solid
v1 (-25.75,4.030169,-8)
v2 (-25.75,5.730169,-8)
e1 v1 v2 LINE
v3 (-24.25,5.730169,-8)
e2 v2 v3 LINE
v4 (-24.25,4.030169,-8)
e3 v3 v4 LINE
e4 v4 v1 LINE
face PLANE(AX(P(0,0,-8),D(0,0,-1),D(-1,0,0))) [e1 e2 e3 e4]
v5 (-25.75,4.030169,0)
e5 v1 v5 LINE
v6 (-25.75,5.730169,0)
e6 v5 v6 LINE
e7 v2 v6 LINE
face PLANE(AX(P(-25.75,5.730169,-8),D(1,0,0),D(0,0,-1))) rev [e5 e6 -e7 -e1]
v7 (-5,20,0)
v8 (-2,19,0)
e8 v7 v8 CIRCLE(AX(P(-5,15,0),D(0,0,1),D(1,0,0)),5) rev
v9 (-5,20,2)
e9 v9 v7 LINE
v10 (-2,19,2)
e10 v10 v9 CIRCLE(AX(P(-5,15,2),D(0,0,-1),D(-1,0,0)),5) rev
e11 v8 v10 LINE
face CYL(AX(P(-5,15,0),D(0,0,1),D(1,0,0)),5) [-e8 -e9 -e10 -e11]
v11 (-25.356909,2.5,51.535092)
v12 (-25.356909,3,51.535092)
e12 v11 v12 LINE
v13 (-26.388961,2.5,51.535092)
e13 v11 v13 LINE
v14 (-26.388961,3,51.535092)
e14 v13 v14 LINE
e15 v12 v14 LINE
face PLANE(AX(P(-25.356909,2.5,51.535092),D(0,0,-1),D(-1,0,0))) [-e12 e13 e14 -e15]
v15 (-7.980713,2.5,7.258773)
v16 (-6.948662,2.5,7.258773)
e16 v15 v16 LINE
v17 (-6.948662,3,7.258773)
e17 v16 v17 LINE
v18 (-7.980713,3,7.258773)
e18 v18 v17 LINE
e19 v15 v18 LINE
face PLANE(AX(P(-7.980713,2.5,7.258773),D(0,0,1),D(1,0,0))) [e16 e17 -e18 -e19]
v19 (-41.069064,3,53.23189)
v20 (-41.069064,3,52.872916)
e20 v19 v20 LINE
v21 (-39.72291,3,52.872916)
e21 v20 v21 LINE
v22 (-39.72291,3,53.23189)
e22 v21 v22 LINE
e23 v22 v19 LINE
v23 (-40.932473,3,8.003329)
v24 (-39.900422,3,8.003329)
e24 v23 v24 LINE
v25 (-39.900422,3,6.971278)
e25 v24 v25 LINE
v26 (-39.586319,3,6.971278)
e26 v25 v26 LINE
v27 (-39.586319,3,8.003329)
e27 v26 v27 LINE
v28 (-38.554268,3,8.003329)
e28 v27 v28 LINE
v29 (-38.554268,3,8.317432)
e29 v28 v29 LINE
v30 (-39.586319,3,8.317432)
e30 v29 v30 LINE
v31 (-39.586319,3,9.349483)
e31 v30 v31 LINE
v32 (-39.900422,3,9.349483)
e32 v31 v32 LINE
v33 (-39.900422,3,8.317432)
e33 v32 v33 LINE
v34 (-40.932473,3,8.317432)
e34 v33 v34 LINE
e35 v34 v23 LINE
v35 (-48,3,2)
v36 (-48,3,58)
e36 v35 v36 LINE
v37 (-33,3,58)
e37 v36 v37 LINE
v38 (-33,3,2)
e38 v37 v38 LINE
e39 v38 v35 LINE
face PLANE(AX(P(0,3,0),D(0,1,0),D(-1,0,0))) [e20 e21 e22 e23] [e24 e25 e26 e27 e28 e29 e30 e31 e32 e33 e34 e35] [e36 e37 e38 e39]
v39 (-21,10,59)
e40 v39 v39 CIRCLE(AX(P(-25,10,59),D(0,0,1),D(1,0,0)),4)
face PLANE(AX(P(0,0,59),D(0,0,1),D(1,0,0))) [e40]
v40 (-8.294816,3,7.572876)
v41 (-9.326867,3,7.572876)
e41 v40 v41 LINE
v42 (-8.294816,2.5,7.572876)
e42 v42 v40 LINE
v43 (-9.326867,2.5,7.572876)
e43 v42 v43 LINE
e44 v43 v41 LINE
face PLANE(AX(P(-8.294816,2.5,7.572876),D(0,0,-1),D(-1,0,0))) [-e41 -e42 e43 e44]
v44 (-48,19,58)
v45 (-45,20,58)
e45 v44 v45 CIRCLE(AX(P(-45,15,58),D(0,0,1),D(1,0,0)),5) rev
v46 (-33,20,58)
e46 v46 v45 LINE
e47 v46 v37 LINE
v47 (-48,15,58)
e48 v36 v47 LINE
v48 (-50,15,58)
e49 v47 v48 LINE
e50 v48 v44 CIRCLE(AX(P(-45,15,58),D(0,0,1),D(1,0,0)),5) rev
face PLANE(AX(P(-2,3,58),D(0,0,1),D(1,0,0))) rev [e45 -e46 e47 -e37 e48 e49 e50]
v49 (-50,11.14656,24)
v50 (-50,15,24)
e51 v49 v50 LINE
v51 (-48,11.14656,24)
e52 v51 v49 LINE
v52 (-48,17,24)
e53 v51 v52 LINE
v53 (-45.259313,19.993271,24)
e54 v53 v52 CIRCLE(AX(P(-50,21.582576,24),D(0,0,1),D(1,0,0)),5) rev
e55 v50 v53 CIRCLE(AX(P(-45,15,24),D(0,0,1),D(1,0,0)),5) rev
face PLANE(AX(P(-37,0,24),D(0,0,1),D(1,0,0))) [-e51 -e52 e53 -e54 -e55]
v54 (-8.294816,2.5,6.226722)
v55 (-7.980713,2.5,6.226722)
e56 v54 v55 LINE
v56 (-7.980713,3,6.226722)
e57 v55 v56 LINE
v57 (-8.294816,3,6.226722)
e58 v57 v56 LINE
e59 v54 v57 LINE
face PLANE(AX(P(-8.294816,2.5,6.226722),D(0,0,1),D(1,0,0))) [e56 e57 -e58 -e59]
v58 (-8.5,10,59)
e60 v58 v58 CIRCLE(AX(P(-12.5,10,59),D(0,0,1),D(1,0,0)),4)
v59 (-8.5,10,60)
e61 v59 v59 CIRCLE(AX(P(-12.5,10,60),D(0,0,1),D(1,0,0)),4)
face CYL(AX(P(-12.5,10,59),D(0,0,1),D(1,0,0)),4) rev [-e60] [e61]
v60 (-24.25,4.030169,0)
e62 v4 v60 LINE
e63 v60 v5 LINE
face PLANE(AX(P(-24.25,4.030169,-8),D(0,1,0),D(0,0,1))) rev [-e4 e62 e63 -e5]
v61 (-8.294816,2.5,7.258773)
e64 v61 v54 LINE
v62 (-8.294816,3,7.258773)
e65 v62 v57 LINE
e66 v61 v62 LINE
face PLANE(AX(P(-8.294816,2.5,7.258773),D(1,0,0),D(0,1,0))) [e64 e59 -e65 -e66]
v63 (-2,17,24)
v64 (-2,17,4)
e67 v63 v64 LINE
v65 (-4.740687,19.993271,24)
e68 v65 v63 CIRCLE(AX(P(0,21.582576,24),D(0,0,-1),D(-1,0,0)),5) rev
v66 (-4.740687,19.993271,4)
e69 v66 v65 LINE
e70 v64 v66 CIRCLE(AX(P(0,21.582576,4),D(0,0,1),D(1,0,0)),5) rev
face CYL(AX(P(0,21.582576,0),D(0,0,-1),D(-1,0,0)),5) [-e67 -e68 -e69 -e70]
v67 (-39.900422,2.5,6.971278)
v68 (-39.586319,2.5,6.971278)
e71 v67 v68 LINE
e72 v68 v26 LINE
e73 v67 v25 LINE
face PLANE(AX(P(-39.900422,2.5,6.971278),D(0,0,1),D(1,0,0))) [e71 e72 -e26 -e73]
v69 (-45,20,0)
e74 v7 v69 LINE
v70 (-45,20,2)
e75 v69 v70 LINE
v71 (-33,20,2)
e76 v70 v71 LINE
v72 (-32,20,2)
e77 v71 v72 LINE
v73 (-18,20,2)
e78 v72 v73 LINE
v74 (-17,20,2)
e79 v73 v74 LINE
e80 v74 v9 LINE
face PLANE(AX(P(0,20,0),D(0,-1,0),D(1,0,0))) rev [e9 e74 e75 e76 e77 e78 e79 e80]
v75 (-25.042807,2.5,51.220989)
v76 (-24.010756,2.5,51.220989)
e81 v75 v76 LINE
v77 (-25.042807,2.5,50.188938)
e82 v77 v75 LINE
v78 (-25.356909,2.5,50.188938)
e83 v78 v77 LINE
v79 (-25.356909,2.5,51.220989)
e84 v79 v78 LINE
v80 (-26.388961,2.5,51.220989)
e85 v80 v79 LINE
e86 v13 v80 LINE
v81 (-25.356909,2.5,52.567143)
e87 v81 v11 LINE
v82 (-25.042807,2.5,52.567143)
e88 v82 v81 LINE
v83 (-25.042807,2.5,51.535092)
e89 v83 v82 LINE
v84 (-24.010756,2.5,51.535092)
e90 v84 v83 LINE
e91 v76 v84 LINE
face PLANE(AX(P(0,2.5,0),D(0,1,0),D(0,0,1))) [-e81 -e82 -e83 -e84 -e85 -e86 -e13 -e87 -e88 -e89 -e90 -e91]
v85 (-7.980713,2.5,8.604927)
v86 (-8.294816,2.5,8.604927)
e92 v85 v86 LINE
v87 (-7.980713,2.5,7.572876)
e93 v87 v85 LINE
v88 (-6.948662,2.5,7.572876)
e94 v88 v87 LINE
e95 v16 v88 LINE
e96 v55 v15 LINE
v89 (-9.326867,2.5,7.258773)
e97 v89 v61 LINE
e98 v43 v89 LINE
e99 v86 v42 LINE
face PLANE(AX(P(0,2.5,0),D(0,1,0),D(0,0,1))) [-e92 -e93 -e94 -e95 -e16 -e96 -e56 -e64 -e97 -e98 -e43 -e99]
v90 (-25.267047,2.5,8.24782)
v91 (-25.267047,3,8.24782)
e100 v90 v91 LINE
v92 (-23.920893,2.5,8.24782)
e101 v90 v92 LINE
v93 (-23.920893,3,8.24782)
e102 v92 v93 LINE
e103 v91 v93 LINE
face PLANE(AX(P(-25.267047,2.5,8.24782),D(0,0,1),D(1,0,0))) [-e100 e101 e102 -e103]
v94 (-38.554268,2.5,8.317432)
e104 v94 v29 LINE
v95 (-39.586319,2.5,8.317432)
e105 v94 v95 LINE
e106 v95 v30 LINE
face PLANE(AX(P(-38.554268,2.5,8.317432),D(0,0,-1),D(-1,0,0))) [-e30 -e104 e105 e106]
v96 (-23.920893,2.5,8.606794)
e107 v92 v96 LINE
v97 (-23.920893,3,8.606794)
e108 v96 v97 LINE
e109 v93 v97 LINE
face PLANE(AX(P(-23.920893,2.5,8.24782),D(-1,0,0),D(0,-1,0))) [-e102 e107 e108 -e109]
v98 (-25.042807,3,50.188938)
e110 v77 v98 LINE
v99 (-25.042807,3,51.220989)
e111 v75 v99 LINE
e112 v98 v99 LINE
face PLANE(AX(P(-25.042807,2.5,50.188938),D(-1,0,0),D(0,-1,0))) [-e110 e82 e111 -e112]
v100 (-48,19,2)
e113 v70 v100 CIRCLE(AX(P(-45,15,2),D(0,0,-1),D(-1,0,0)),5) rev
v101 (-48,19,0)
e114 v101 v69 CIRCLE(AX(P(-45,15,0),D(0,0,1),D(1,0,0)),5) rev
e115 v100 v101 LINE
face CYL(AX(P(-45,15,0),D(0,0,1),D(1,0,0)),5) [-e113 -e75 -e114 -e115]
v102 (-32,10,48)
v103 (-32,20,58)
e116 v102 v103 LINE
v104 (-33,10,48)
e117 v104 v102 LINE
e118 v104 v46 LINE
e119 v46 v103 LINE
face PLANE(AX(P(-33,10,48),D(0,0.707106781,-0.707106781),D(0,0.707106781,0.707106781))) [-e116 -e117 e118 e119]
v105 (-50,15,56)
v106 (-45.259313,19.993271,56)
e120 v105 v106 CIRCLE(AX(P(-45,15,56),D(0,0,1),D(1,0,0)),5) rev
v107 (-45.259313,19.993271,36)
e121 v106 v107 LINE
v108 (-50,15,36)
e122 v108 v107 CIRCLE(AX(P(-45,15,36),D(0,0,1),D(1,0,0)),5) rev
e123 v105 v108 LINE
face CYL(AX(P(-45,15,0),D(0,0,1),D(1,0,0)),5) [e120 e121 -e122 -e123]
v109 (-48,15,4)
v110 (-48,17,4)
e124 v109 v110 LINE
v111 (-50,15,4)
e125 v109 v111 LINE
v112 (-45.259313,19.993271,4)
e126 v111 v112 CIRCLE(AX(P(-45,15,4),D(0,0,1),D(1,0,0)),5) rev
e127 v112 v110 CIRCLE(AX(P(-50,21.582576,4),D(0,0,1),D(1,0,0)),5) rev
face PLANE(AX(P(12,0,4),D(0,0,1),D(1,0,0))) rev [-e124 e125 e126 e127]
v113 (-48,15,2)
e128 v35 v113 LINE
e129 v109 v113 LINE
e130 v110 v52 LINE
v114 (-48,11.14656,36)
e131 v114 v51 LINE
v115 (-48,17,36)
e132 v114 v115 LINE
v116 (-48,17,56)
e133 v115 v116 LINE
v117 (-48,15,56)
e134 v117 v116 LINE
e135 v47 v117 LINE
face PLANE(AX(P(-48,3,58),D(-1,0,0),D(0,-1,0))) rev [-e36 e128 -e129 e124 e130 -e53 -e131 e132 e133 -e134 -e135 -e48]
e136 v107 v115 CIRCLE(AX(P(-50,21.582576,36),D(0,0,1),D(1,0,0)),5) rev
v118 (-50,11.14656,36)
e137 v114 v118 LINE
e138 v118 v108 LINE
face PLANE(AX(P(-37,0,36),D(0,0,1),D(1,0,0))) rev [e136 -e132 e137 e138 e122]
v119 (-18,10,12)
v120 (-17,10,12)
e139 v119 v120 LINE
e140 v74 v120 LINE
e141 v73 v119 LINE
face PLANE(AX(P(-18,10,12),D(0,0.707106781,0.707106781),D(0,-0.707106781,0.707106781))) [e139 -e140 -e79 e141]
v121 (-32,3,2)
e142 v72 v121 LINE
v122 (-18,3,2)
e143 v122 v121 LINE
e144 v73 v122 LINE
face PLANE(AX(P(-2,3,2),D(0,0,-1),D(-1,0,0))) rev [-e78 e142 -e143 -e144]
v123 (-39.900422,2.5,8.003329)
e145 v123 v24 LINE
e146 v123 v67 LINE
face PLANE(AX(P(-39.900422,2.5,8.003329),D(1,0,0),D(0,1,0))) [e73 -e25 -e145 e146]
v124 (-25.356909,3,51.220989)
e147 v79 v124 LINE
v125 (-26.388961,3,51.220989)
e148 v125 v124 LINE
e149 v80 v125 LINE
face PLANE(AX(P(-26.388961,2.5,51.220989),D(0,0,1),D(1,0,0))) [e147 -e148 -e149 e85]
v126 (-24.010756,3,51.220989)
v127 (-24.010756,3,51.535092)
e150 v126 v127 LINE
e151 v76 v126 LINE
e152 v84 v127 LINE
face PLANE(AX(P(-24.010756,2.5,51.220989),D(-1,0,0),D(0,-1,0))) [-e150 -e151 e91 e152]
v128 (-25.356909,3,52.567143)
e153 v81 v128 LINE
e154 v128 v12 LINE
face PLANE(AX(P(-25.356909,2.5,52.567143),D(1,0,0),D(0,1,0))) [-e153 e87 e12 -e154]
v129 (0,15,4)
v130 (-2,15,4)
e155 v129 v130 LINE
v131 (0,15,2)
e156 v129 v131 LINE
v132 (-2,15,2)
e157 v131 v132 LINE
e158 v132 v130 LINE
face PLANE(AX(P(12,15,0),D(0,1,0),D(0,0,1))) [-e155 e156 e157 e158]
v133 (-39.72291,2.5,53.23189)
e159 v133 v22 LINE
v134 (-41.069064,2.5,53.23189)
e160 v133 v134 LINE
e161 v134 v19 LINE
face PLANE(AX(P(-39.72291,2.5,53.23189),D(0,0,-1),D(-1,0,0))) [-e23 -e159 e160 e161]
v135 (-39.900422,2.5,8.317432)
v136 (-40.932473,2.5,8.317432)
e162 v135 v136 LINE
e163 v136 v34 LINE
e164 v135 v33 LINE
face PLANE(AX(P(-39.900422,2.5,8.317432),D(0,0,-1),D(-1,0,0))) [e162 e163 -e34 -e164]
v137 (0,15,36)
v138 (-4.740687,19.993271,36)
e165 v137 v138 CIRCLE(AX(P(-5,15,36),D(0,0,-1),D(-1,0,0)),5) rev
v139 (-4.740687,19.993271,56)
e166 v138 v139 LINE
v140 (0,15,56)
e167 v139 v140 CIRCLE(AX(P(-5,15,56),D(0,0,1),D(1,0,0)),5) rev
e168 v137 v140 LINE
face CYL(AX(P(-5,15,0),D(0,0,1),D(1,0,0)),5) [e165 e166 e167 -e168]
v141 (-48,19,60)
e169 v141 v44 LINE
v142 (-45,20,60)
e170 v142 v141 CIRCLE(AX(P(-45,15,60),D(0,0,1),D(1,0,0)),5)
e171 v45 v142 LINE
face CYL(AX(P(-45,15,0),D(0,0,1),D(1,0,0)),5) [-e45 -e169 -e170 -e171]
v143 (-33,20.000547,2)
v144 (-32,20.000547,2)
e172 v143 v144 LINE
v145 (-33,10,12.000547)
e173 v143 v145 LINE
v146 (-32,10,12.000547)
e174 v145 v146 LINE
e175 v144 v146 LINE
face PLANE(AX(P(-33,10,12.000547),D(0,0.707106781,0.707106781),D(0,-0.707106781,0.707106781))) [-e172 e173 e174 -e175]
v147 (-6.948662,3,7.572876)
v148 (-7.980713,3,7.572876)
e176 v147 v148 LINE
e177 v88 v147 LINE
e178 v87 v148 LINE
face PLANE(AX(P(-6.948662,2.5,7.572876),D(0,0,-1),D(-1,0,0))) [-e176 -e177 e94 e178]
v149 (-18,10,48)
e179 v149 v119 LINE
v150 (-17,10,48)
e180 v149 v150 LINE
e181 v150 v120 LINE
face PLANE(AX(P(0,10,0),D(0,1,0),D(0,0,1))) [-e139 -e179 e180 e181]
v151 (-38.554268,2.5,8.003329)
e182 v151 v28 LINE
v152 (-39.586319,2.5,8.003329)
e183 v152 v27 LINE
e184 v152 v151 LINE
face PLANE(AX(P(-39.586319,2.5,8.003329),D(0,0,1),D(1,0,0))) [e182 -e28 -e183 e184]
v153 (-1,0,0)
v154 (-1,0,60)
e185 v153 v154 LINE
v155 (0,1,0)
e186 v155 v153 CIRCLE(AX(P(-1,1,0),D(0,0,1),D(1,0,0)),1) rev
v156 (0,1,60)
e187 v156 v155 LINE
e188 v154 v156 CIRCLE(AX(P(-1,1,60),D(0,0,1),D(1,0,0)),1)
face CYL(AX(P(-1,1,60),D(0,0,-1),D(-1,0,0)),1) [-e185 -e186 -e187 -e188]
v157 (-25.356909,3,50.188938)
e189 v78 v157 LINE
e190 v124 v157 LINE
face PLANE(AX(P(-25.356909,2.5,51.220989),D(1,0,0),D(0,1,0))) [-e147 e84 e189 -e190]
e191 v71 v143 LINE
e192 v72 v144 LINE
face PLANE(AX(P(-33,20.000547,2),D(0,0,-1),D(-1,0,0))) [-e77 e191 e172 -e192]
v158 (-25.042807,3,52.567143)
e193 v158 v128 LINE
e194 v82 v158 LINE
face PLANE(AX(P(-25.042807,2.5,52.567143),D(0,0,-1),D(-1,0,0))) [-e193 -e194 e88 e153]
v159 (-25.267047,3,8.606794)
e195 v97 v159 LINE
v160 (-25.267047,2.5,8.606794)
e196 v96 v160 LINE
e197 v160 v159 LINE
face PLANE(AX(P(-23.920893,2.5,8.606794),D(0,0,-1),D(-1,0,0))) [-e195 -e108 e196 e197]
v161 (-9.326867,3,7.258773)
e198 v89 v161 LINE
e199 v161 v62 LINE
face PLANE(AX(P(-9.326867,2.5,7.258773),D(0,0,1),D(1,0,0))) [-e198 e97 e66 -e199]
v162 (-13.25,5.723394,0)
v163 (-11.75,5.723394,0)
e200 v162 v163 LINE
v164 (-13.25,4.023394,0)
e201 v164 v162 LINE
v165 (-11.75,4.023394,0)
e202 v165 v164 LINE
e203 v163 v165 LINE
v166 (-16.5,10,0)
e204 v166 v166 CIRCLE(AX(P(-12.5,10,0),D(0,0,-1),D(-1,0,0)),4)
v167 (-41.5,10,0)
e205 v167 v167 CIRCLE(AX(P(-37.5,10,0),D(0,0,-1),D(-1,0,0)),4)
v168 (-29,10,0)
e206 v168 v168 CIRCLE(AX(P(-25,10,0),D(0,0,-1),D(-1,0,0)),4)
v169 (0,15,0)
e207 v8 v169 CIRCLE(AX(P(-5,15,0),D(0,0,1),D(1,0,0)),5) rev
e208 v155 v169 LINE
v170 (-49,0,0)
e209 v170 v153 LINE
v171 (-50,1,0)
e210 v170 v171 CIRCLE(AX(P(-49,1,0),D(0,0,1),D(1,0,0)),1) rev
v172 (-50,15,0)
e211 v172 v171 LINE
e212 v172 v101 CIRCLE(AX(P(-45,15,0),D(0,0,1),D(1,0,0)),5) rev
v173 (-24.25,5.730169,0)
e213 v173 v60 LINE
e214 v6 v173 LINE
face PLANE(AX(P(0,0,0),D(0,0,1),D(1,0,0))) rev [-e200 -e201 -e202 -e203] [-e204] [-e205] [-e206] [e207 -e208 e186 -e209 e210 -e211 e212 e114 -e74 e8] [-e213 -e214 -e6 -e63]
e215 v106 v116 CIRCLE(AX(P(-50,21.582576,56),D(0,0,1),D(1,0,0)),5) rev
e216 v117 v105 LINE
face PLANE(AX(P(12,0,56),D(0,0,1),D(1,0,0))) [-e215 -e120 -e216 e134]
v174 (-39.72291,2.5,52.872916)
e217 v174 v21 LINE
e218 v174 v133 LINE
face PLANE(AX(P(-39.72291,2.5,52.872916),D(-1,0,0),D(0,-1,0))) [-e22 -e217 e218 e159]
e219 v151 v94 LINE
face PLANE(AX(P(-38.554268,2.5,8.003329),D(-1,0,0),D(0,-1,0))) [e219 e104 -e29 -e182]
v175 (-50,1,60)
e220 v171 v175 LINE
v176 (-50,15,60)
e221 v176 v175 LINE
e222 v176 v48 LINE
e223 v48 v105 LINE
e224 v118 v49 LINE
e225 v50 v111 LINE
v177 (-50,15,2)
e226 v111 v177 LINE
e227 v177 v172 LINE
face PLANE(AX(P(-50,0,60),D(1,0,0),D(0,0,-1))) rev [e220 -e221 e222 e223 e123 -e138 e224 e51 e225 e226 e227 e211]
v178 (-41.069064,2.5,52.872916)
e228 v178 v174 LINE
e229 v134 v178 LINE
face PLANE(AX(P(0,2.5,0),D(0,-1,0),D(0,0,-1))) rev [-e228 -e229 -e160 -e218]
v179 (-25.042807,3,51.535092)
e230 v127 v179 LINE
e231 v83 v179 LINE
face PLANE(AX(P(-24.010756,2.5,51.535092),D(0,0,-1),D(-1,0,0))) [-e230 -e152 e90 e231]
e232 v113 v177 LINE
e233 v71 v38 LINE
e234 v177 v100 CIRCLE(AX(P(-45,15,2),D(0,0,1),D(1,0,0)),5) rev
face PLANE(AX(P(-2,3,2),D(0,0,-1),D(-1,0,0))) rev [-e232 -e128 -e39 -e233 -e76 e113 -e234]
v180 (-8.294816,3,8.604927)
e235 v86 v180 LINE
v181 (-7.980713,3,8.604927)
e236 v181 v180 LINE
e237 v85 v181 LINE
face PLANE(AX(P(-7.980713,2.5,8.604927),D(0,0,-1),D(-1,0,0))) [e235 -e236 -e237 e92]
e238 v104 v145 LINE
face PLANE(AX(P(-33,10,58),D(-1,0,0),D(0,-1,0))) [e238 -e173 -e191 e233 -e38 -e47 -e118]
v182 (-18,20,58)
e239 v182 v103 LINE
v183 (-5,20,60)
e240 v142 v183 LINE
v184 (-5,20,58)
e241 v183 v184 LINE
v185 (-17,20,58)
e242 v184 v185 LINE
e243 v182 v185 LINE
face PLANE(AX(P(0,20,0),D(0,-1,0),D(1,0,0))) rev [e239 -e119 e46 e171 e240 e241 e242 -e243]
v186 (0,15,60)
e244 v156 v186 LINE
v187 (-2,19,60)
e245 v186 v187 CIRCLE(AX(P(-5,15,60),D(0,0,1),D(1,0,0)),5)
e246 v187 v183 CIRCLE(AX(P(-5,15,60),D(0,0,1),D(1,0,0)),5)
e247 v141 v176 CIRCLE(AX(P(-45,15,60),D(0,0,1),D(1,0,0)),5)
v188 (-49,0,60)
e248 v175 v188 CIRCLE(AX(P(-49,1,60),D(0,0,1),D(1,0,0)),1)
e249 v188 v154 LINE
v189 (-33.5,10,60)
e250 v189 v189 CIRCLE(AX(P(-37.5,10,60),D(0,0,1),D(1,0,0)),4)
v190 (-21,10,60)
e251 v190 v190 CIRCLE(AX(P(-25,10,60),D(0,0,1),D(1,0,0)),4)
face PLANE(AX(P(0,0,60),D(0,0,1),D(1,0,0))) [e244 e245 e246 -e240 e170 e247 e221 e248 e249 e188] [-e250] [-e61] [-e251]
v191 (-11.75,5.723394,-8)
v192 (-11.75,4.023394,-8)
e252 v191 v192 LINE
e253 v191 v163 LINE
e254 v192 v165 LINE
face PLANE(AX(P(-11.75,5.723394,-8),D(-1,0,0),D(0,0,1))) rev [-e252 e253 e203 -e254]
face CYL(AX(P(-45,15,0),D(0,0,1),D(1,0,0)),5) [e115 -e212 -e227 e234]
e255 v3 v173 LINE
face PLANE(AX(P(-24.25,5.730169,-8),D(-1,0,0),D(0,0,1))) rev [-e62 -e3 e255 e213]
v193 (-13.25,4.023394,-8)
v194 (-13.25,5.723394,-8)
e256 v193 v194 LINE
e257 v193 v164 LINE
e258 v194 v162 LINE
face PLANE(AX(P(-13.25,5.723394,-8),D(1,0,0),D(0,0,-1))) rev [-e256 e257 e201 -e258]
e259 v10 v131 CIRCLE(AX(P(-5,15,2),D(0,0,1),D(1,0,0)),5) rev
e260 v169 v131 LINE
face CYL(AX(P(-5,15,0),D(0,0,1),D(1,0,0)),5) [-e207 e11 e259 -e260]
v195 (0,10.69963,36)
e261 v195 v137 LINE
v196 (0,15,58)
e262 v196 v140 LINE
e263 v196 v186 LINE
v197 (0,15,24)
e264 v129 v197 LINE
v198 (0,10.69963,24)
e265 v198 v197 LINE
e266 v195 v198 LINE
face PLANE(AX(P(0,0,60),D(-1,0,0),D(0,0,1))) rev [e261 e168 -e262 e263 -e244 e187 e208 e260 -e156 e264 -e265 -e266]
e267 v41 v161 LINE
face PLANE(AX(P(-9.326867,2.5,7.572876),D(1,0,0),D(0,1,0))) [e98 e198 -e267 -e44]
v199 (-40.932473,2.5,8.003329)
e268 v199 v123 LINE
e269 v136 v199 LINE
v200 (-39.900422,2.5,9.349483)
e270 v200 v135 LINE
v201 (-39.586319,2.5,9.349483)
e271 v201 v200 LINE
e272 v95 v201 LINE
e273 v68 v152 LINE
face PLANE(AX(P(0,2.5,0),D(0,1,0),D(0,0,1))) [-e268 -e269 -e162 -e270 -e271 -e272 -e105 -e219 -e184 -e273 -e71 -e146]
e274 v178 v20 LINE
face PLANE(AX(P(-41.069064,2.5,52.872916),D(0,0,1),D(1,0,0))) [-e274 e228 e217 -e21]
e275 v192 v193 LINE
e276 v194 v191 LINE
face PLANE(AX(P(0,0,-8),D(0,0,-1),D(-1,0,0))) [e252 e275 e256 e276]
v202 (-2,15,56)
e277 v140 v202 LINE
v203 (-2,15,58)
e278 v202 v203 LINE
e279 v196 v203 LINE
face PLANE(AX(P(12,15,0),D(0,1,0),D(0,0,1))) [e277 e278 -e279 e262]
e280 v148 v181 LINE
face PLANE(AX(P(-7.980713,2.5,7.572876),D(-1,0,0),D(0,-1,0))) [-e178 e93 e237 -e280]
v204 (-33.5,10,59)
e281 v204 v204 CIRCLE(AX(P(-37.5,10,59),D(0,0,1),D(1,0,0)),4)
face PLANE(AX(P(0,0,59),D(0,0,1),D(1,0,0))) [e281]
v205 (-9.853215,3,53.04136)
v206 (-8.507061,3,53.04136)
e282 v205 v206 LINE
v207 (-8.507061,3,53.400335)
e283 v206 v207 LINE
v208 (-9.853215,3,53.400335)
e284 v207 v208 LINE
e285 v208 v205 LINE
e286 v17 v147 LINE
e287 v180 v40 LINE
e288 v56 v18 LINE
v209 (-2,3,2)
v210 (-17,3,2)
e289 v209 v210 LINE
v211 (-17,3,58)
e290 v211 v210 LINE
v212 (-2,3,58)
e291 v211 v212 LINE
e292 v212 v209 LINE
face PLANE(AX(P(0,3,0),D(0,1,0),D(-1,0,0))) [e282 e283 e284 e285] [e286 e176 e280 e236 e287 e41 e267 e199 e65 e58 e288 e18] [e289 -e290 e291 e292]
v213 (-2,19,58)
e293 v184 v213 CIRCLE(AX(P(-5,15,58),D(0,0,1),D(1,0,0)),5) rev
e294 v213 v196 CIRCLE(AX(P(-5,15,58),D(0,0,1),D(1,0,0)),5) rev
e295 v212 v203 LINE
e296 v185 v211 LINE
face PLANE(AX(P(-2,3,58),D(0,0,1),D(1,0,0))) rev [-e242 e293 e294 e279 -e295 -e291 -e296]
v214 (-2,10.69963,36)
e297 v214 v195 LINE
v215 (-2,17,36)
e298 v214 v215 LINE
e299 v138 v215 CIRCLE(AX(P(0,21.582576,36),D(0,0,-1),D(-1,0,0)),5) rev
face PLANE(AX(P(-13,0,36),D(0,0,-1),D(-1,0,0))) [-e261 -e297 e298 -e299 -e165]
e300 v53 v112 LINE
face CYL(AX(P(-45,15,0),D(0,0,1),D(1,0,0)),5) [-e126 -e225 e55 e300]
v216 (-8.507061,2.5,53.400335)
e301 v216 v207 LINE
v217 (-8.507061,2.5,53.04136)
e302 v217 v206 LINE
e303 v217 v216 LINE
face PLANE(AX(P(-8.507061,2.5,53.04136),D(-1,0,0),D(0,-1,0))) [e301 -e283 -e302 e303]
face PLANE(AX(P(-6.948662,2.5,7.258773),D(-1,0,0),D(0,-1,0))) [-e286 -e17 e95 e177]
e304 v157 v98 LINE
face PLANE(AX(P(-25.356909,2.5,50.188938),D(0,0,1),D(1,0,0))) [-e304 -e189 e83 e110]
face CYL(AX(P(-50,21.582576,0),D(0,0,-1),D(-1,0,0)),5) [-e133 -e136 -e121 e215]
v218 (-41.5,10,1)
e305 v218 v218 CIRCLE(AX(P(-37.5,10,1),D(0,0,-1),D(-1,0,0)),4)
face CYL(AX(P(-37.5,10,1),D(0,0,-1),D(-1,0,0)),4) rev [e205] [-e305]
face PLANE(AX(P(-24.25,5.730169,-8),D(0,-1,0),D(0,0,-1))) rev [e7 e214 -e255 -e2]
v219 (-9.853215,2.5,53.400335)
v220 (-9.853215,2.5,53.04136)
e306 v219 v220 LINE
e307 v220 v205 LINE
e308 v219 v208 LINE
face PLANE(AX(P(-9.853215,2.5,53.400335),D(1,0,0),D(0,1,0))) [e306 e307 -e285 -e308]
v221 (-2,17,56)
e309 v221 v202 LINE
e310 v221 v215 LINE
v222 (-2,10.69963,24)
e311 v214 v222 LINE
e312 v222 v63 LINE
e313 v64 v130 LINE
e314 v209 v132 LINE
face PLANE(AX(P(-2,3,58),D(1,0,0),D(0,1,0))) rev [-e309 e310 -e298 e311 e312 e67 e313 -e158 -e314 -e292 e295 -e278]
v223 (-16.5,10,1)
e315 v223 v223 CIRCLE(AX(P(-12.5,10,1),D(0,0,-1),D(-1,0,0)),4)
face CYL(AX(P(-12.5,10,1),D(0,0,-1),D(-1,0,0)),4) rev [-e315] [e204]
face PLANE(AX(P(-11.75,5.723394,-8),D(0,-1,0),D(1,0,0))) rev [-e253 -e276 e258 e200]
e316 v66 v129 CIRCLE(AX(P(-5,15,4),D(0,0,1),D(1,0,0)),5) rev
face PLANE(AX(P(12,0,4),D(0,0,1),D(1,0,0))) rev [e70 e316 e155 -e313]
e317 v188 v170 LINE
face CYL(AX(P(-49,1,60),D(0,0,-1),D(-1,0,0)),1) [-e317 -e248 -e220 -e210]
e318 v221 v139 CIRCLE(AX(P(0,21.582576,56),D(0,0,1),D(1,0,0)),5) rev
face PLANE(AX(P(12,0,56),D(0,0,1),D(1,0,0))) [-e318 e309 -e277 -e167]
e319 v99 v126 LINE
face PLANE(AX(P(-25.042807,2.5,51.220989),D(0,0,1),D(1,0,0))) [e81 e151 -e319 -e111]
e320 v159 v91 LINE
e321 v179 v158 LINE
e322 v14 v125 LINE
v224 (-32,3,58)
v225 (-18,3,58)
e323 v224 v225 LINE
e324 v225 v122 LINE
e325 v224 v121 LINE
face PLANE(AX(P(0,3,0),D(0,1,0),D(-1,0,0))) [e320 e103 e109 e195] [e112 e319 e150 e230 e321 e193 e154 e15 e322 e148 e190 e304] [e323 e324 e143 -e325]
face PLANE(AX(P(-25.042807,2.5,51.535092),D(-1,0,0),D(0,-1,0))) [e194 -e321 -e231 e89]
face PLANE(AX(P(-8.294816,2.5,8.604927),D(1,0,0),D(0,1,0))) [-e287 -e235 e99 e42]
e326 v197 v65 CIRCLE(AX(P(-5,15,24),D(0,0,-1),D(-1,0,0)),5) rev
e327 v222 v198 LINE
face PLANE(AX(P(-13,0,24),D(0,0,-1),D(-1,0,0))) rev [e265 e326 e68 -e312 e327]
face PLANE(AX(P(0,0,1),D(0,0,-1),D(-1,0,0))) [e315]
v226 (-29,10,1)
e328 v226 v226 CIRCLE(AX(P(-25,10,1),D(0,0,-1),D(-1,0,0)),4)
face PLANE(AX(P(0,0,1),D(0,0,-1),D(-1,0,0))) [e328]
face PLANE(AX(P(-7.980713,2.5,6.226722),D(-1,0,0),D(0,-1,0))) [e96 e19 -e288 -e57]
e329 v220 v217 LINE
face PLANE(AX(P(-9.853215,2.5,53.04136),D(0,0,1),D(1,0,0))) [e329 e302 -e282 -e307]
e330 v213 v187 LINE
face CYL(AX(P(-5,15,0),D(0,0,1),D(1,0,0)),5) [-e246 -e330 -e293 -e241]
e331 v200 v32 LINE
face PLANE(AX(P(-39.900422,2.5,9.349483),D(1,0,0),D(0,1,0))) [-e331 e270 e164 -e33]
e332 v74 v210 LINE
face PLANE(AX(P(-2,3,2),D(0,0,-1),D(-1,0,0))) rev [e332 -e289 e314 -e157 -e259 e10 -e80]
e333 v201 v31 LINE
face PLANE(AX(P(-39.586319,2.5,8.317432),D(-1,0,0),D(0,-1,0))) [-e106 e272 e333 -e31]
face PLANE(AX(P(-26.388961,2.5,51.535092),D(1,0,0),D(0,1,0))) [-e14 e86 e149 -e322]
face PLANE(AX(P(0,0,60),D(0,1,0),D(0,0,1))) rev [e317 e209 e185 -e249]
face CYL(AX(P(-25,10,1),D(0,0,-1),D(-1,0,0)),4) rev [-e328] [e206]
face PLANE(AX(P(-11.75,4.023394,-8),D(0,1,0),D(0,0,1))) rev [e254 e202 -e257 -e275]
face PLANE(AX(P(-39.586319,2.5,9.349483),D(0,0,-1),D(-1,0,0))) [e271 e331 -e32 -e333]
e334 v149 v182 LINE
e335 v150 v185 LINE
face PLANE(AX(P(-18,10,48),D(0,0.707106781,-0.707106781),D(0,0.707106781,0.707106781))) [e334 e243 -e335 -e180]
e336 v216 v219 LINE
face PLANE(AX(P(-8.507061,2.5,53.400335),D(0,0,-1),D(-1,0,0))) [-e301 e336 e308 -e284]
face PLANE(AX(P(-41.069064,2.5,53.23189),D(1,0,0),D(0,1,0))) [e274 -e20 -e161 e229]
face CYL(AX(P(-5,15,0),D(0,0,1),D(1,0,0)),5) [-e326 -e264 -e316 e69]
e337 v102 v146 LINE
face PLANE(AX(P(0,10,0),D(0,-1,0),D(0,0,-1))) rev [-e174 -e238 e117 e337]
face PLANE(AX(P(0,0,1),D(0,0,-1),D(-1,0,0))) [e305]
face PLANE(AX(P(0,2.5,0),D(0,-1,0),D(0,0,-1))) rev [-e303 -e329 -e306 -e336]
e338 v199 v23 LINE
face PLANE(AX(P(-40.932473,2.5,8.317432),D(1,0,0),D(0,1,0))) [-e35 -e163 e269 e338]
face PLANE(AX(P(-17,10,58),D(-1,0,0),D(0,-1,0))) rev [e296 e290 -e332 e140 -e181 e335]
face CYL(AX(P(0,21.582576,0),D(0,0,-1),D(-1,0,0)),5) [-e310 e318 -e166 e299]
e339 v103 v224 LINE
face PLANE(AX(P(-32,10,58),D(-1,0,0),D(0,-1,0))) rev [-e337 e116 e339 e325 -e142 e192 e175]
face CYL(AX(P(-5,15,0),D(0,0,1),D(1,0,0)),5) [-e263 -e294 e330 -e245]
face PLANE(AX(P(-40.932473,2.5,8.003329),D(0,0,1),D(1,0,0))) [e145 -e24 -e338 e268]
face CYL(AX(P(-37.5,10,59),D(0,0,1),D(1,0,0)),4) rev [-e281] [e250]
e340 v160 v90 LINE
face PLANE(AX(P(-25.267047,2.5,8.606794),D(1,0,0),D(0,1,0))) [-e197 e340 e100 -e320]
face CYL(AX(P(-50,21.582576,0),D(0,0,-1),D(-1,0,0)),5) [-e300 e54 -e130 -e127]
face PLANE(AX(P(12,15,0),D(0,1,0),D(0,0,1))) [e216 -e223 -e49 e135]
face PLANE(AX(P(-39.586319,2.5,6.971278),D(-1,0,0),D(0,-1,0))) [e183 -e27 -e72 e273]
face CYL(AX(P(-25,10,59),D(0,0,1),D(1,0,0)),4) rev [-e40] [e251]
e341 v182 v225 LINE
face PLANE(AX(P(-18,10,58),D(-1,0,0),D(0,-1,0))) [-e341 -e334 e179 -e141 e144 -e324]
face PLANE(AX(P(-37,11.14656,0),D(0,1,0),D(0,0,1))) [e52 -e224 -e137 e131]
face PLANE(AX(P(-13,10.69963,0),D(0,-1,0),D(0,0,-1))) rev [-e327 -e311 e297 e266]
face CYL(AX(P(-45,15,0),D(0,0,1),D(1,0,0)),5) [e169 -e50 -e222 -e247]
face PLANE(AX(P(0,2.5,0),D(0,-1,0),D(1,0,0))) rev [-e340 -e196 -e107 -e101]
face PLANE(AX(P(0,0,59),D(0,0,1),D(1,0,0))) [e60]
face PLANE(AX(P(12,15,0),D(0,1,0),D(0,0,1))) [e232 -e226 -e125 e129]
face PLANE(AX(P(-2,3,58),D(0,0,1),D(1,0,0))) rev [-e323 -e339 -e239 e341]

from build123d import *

# Parameters (mm, degrees)
ESQUISSE1_W             = 50
ESQUISSE1_H             = 17
BOSS_EXTRU_1_DEPTH      = 60
ESQUISSE2_W             = 46
ESQUISSE2_H             = 56
ENL_V_MAT_EXTRU_1_DEPTH = 14
ESQUISSE3_W             = 5
ESQUISSE3_H             = 60
BOSS_EXTRU_2_DEPTH      = 3
CONG_4_R                = 5
CONG_5_R                = 5
ESQUISSE4_W             = 6
ESQUISSE4_H             = 6.399260537
ESQUISSE4_H_2           = 4.300369731
ENL_V_MAT_EXTRU_2_DEPTH = 13
ESQUISSE5_W             = 6
ESQUISSE5_H             = 3.853440377
ESQUISSE5_H_2           = 6.397176283
ENL_V_MAT_EXTRU_3_DEPTH = 13
ESQUISSE6_W             = 46
ESQUISSE6_H             = 2
BOSS_EXTRU_3_DEPTH      = 3
CONG_6_R                = 5
CONG_7_R                = 5
CONG_8_R                = 5
ESQUISSE7_W             = 2
ESQUISSE7_H             = 5.210267062
ENL_V_MAT_EXTRU_4_DEPTH = 62
ESQUISSE8_W             = 2
ESQUISSE8_H             = 8.257223626
ENL_V_MAT_EXTRU_5_DEPTH = 62
ESQUISSE9_W             = 1
ESQUISSE9_H             = 56
BOSS_EXTRU_4_DEPTH      = 7
BOSS_EXTRU_5_DEPTH      = 1
BOSS_EXTRU_6_DEPTH      = 1
BOSS_EXTRU_7_DEPTH      = 1
BOSS_EXTRU_8_DEPTH      = 1
ENL_V_MAT_EXTRU_6_DEPTH = 0.5
ESQUISSE19_W            = 1.346153846
ESQUISSE19_H            = 0.358974359
ESQUISSE19_W_2          = 1.346153847
ENL_V_MAT_EXTRU_7_DEPTH = 0.5
CONG_9_R                = 1
CONG_10_R               = 1
ENL_V_MAT_EXTRU_8_DEPTH = 1
ENL_V_START             = -1
ENL_V_MAT_EXTRU_9_DEPTH = 1
ESQUISSE22_W            = 1.5
ESQUISSE22_H            = 1.7
BOSS_EXTRU_9_DEPTH      = 9


# Some blends are built 0.0001 mm under size
with BuildPart() as part:
    # Esquisse1 → Boss.-Extru.1 (new body)
    with BuildSketch(Plane.XY):
        with Locations((-25, 8.5)):
            Rectangle(ESQUISSE1_W, ESQUISSE1_H)
    extrude(amount=BOSS_EXTRU_1_DEPTH)

    # Esquisse2 → Enlèv. mat.-Extru.1 (cut)
    with BuildSketch(Plane(origin=(0, 17, 0), x_dir=(1, 0, 0), z_dir=(0, 1, 0))):
        with Locations((-25, -30)):
            Rectangle(ESQUISSE2_W, ESQUISSE2_H)
    extrude(amount=-ENL_V_MAT_EXTRU_1_DEPTH, mode=Mode.SUBTRACT)

    # Esquisse3 → Boss.-Extru.2 (add)
    with BuildSketch(Plane(origin=(0, 17, 0), x_dir=(1, 0, 0), z_dir=(0, 1, 0))):
        with Locations((-2.5, -30)):
            Rectangle(ESQUISSE3_W, ESQUISSE3_H)
        with Locations((-47.5, -30)):
            Rectangle(ESQUISSE3_W, ESQUISSE3_H)
    extrude(amount=BOSS_EXTRU_2_DEPTH)

    # Congé4
    cong_4_edges = [part.edges().sort_by_distance(p)[0] for p in [
        (-50, 20, 30),
        (0, 20, 30),
    ]]
    fillet(cong_4_edges, radius=CONG_4_R - 0.0001)  # a hair under: the kernel refuses the full size

    # Congé5
    # the kernel refuses this fillet: 5 mm, written as the material it takes off along each edge
    with BuildSketch(Plane(origin=(-45, 17, 69.456439237), x_dir=(0, 1, 0), z_dir=(0, 0, -1))) as cong_5_piece_1:
        with BuildLine():
            CenterArc((4.582575695, -5), CONG_5_R, 90, 66.421821522)
            Line((0, -3), (0, 0))
            Line((0, 0), (4.582575695, 0))
        make_face()
    extrude(amount=78.912878475, mode=Mode.SUBTRACT)
    with BuildSketch(Plane(origin=(-5, 17, 69.456439237), x_dir=(0, 1, 0), z_dir=(0, 0, -1))) as cong_5_piece_2:
        with BuildLine():
            CenterArc((4.582575695, 5), CONG_5_R, 203.578178478, 66.421821522)
            Line((0, 3), (0, 0))
            Line((0, 0), (4.582575695, 0))
        make_face()
    extrude(amount=78.912878475, mode=Mode.SUBTRACT)

    # Esquisse4 → Enlèv. mat.-Extru.2 (cut)
    with BuildSketch(Plane(origin=(0, 0, 0), x_dir=(0, 0, -1), z_dir=(1, 0, 0))):
        with Locations((-27, 18.199630269)):
            Rectangle(ESQUISSE4_W, ESQUISSE4_H)
        with Locations((-27, 12.849815135)):
            Rectangle(ESQUISSE4_W, ESQUISSE4_H_2)
        with Locations((-33, 12.849815135)):
            Rectangle(ESQUISSE4_W, ESQUISSE4_H_2)
        with Locations((-33, 18.199630269)):
            Rectangle(ESQUISSE4_W, ESQUISSE4_H)
    extrude(amount=-ENL_V_MAT_EXTRU_2_DEPTH, mode=Mode.SUBTRACT)

    # Esquisse5 → Enlèv. mat.-Extru.3 (cut)
    with BuildSketch(Plane.ZY.offset(50)):
        with Locations((27, 13.073279812)):
            Rectangle(ESQUISSE5_W, ESQUISSE5_H)
        with Locations((33, 13.073279812)):
            Rectangle(ESQUISSE5_W, ESQUISSE5_H)
        with Locations((33, 18.198588142)):
            Rectangle(ESQUISSE5_W, ESQUISSE5_H_2)
        with Locations((27, 18.198588142)):
            Rectangle(ESQUISSE5_W, ESQUISSE5_H_2)
    extrude(amount=-ENL_V_MAT_EXTRU_3_DEPTH, mode=Mode.SUBTRACT)

    # Esquisse6 → Boss.-Extru.3 (add)
    with BuildSketch(Plane(origin=(0, 17, 0), x_dir=(1, 0, 0), z_dir=(0, 1, 0))):
        with Locations((-25, -1)):
            Rectangle(ESQUISSE6_W, ESQUISSE6_H)
        with Locations((-25, -59)):
            Rectangle(ESQUISSE6_W, ESQUISSE6_H)
    extrude(amount=BOSS_EXTRU_3_DEPTH)

    # Congé6
    # the kernel refuses this fillet: 5 mm, written as the material it takes off along each edge
    with BuildSketch(Plane(origin=(-2, 20, 9.499833331), x_dir=(0, -1, 0), z_dir=(0, 0, -1))) as cong_6_piece_1:
        with BuildLine():
            CenterArc((5, 2.999933333), CONG_6_R, 180, 36.868942712)
            Line((0, 2.999933333), (-0.1, 2.999933333))
            Line((-0.1, 2.999933333), (-0.1, 0))
            Line((-0.1, 0), (0, -0.1))
            ThreePointArc((0, -0.1), (0.499975, -0.1), (0.919949, -0.059998667))
            Line((0.919949, -0.059998667), (0.99995, 0))
        make_face()
    extrude(amount=16.999666663, mode=Mode.SUBTRACT)

    # Congé7
    # the kernel refuses this fillet: 5 mm, written as the material it takes off along each edge
    with BuildSketch(Plane(origin=(-48, 20, -7.499833331), x_dir=(0, -1, 0), z_dir=(0, 0, 1))) as cong_7_piece_1:
        with BuildLine():
            CenterArc((5, 2.999933333), CONG_7_R, 180, 36.868942712)
            Line((0, 2.999933333), (-0.1, 2.999933333))
            Line((-0.1, 2.999933333), (-0.1, 0))
            Line((-0.1, 0), (0, -0.1))
            ThreePointArc((0, -0.1), (0.499975, -0.1), (0.919949, -0.059998667))
            Line((0.919949, -0.059998667), (0.99995, 0))
        make_face()
    extrude(amount=16.999666663, mode=Mode.SUBTRACT)

    # Congé8
    # the kernel refuses this fillet: 5 mm, written as the material it takes off along each edge
    with BuildSketch(Plane(origin=(-2, 20, 67.499833331), x_dir=(0, -1, 0), z_dir=(0, 0, -1))) as cong_8_piece_1:
        with BuildLine():
            CenterArc((5, 2.999933333), CONG_8_R, 180, 36.868942712)
            Line((0, 2.999933333), (-0.1, 2.999933333))
            Line((-0.1, 2.999933333), (-0.1, 0))
            Line((-0.1, 0), (0, -0.1))
            ThreePointArc((0, -0.1), (0.499975, -0.1), (0.919949, -0.059998667))
            Line((0.919949, -0.059998667), (0.99995, 0))
        make_face()
    extrude(amount=16.999666663, mode=Mode.SUBTRACT)
    with BuildSketch(Plane(origin=(-48, 20, 50.500166669), x_dir=(1, 0, 0), z_dir=(0, 0, 1))) as cong_8_piece_2:
        with BuildLine():
            CenterArc((2.999933333, -5), CONG_8_R, 90, 36.868942712)
            Line((0, -0.99995), (-0.059998667, -0.919949))
            ThreePointArc((-0.059998667, -0.919949), (-0.1, -0.499975), (-0.1, 0))
            Line((-0.1, 0), (0, 0.1))
            Line((0, 0.1), (2.999933333, 0.1))
            Line((2.999933333, 0.1), (2.999933333, 0))
        make_face()
    extrude(amount=16.999666663, mode=Mode.SUBTRACT)

    # Esquisse7 → Enlèv. mat.-Extru.4 (cut)
    with BuildSketch(Plane.ZY.offset(50)):
        with Locations((3, 17.605133531)):
            Rectangle(ESQUISSE7_W, ESQUISSE7_H)
    extrude(amount=-ENL_V_MAT_EXTRU_4_DEPTH, mode=Mode.SUBTRACT)

    # Esquisse8 → Enlèv. mat.-Extru.5 (cut)
    with BuildSketch(Plane.ZY.offset(50)):
        with Locations((57, 19.128611813)):
            Rectangle(ESQUISSE8_W, ESQUISSE8_H)
    extrude(amount=-ENL_V_MAT_EXTRU_5_DEPTH, mode=Mode.SUBTRACT)

    # Esquisse9 → Boss.-Extru.4 (add)
    with BuildSketch(Plane(origin=(0, 3, 0), x_dir=(1, 0, 0), z_dir=(0, 1, 0))):
        with Locations((-17.5, -30)):
            Rectangle(ESQUISSE9_W, ESQUISSE9_H)
        with Locations((-32.5, -30)):
            Rectangle(ESQUISSE9_W, ESQUISSE9_H)
    extrude(amount=BOSS_EXTRU_4_DEPTH)

    # Esquisse13 → Boss.-Extru.5 (add)
    with BuildSketch(Plane(origin=(-17, 0, 0), x_dir=(0, 0, -1), z_dir=(1, 0, 0))):
        Polygon((-58, 10), (-48, 10), (-58, 20), align=None)
    extrude(amount=-BOSS_EXTRU_5_DEPTH)

    # Esquisse15 → Boss.-Extru.6 (add)
    with BuildSketch(Plane(origin=(-32, 0, 0), x_dir=(0, 0, -1), z_dir=(1, 0, 0))):
        Polygon((-58, 10), (-48, 10), (-58, 20), align=None)
    extrude(amount=-BOSS_EXTRU_6_DEPTH)

    # Esquisse16 → Boss.-Extru.7 (add)
    with BuildSketch(Plane(origin=(-32, 0, 0), x_dir=(0, 0, -1), z_dir=(1, 0, 0))):
        Polygon((-2, 10), (-12.000546535, 10), (-2, 20.000546535), align=None)
    extrude(amount=-BOSS_EXTRU_7_DEPTH)

    # Esquisse17 → Boss.-Extru.8 (add)
    with BuildSketch(Plane(origin=(-17, 0, 0), x_dir=(0, 0, -1), z_dir=(1, 0, 0))):
        Polygon((-2, 10), (-12, 10), (-2, 20), align=None)
    extrude(amount=-BOSS_EXTRU_8_DEPTH)

    # Esquisse18 → Enlèv. mat.-Extru.6 (cut)
    with BuildSketch(Plane(origin=(0, 3, 0), x_dir=(1, 0, 0), z_dir=(0, 1, 0))):
        Polygon((-8.294815626, -7.258773386), (-8.294815626, -6.226722104), (-7.980713062, -6.226722104), (-7.980713062, -7.258773386), (-6.94866178, -7.258773386), (-6.94866178, -7.57287595), (-7.980713062, -7.57287595), (-7.980713062, -8.604927232), (-8.294815626, -8.604927232), (-8.294815626, -7.57287595), (-9.326866908, -7.57287595), (-9.326866908, -7.258773386), align=None)
        Polygon((-39.900421528, -8.003329449), (-39.900421528, -6.971278167), (-39.586318963, -6.971278167), (-39.586318963, -8.003329449), (-38.554267681, -8.003329449), (-38.554267681, -8.317432014), (-39.586318963, -8.317432014), (-39.586318963, -9.349483296), (-39.900421528, -9.349483296), (-39.900421528, -8.317432014), (-40.93247281, -8.317432014), (-40.93247281, -8.003329449), align=None)
        Polygon((-25.356909486, -51.22098936), (-25.356909486, -50.188938078), (-25.042806922, -50.188938078), (-25.042806922, -51.22098936), (-24.01075564, -51.22098936), (-24.01075564, -51.535091925), (-25.042806922, -51.535091925), (-25.042806922, -52.567143207), (-25.356909486, -52.567143207), (-25.356909486, -51.535091925), (-26.388960769, -51.535091925), (-26.388960769, -51.22098936), align=None)
    extrude(amount=-ENL_V_MAT_EXTRU_6_DEPTH, mode=Mode.SUBTRACT)

    # Esquisse19 → Enlèv. mat.-Extru.7 (cut)
    with BuildSketch(Plane(origin=(0, 3, 0), x_dir=(1, 0, 0), z_dir=(0, 1, 0))):
        with Locations((-40.395987335, -53.05240306)):
            Rectangle(ESQUISSE19_W, ESQUISSE19_H)
        with Locations((-24.593970415, -8.42730727)):
            Rectangle(ESQUISSE19_W, ESQUISSE19_H)
        with Locations((-9.180137719, -53.220847448)):
            Rectangle(ESQUISSE19_W_2, ESQUISSE19_H)
    extrude(amount=-ENL_V_MAT_EXTRU_7_DEPTH, mode=Mode.SUBTRACT)

    # Congé9
    cong_9_edges = [part.edges().sort_by_distance(p)[0] for p in [
        (0, 0, 30),
    ]]
    fillet(cong_9_edges, radius=CONG_9_R)

    # Congé10
    cong_10_edges = [part.edges().sort_by_distance(p)[0] for p in [
        (-50, 0, 30),
    ]]
    fillet(cong_10_edges, radius=CONG_10_R)

    # Esquisse20 → Enlèv. mat.-Extru.8 (cut)
    with BuildSketch(Plane(origin=(0, 0, 0), x_dir=(-1, 0, 0), z_dir=(0, 0, -1))):
        with BuildLine():
            ThreePointArc((12.5, 14), (8.5, 10), (12.5, 6))
            Line((12.5, 6), (12.5, 14))
        make_face()
        with BuildLine():
            Line((12.5, 14), (12.5, 6))
            ThreePointArc((12.5, 6), (15.328427125, 7.171572875), (16.5, 10))
            ThreePointArc((16.5, 10), (15.328427125, 12.828427125), (12.5, 14))
        make_face()
        with BuildLine():
            ThreePointArc((25, 14), (21, 10), (25, 6))
            Line((25, 6), (25, 14))
        make_face()
        with BuildLine():
            Line((25, 14), (25, 6))
            ThreePointArc((25, 6), (27.828427125, 7.171572875), (29, 10))
            ThreePointArc((29, 10), (27.828427125, 12.828427125), (25, 14))
        make_face()
        with BuildLine():
            ThreePointArc((37.5, 14), (33.5, 10), (37.5, 6))
            Line((37.5, 6), (37.5, 14))
        make_face()
        with BuildLine():
            Line((37.5, 14), (37.5, 6))
            ThreePointArc((37.5, 6), (40.328427125, 7.171572875), (41.5, 10))
            ThreePointArc((41.5, 10), (40.328427125, 12.828427125), (37.5, 14))
        make_face()
    extrude(amount=-ENL_V_MAT_EXTRU_8_DEPTH, mode=Mode.SUBTRACT)

    # Esquisse21 → Enlèv. mat.-Extru.9 (cut)
    with BuildSketch(Plane.XY.offset(60).offset(ENL_V_START)):
        with BuildLine():
            ThreePointArc((-37.5, 14), (-41.5, 10), (-37.5, 6))
            Line((-37.5, 6), (-37.5, 14))
        make_face()
        with BuildLine():
            Line((-37.5, 14), (-37.5, 6))
            ThreePointArc((-37.5, 6), (-34.671572875, 7.171572875), (-33.5, 10))
            ThreePointArc((-33.5, 10), (-34.671572875, 12.828427125), (-37.5, 14))
        make_face()
        with BuildLine():
            ThreePointArc((-25, 14), (-29, 10), (-25, 6))
            Line((-25, 6), (-25, 14))
        make_face()
        with BuildLine():
            Line((-25, 14), (-25, 6))
            ThreePointArc((-25, 6), (-22.171572875, 7.171572875), (-21, 10))
            ThreePointArc((-21, 10), (-22.171572875, 12.828427125), (-25, 14))
        make_face()
        with BuildLine():
            ThreePointArc((-12.5, 14), (-16.5, 10), (-12.5, 6))
            Line((-12.5, 6), (-12.5, 14))
        make_face()
        with BuildLine():
            Line((-12.5, 14), (-12.5, 6))
            ThreePointArc((-12.5, 6), (-9.671572875, 7.171572875), (-8.5, 10))
            ThreePointArc((-8.5, 10), (-9.671572875, 12.828427125), (-12.5, 14))
        make_face()
    extrude(amount=ENL_V_MAT_EXTRU_9_DEPTH, mode=Mode.SUBTRACT)

    # Esquisse22 → Boss.-Extru.9 (add)
    with BuildSketch(Plane(origin=(0, 0, 1), x_dir=(-1, 0, 0), z_dir=(0, 0, -1))):
        with Locations((12.5, 4.873394073)):
            Rectangle(ESQUISSE22_W, ESQUISSE22_H)
        with Locations((25, 4.880168725)):
            Rectangle(ESQUISSE22_W, ESQUISSE22_H)
    extrude(amount=BOSS_EXTRU_9_DEPTH)


solid = part.part
